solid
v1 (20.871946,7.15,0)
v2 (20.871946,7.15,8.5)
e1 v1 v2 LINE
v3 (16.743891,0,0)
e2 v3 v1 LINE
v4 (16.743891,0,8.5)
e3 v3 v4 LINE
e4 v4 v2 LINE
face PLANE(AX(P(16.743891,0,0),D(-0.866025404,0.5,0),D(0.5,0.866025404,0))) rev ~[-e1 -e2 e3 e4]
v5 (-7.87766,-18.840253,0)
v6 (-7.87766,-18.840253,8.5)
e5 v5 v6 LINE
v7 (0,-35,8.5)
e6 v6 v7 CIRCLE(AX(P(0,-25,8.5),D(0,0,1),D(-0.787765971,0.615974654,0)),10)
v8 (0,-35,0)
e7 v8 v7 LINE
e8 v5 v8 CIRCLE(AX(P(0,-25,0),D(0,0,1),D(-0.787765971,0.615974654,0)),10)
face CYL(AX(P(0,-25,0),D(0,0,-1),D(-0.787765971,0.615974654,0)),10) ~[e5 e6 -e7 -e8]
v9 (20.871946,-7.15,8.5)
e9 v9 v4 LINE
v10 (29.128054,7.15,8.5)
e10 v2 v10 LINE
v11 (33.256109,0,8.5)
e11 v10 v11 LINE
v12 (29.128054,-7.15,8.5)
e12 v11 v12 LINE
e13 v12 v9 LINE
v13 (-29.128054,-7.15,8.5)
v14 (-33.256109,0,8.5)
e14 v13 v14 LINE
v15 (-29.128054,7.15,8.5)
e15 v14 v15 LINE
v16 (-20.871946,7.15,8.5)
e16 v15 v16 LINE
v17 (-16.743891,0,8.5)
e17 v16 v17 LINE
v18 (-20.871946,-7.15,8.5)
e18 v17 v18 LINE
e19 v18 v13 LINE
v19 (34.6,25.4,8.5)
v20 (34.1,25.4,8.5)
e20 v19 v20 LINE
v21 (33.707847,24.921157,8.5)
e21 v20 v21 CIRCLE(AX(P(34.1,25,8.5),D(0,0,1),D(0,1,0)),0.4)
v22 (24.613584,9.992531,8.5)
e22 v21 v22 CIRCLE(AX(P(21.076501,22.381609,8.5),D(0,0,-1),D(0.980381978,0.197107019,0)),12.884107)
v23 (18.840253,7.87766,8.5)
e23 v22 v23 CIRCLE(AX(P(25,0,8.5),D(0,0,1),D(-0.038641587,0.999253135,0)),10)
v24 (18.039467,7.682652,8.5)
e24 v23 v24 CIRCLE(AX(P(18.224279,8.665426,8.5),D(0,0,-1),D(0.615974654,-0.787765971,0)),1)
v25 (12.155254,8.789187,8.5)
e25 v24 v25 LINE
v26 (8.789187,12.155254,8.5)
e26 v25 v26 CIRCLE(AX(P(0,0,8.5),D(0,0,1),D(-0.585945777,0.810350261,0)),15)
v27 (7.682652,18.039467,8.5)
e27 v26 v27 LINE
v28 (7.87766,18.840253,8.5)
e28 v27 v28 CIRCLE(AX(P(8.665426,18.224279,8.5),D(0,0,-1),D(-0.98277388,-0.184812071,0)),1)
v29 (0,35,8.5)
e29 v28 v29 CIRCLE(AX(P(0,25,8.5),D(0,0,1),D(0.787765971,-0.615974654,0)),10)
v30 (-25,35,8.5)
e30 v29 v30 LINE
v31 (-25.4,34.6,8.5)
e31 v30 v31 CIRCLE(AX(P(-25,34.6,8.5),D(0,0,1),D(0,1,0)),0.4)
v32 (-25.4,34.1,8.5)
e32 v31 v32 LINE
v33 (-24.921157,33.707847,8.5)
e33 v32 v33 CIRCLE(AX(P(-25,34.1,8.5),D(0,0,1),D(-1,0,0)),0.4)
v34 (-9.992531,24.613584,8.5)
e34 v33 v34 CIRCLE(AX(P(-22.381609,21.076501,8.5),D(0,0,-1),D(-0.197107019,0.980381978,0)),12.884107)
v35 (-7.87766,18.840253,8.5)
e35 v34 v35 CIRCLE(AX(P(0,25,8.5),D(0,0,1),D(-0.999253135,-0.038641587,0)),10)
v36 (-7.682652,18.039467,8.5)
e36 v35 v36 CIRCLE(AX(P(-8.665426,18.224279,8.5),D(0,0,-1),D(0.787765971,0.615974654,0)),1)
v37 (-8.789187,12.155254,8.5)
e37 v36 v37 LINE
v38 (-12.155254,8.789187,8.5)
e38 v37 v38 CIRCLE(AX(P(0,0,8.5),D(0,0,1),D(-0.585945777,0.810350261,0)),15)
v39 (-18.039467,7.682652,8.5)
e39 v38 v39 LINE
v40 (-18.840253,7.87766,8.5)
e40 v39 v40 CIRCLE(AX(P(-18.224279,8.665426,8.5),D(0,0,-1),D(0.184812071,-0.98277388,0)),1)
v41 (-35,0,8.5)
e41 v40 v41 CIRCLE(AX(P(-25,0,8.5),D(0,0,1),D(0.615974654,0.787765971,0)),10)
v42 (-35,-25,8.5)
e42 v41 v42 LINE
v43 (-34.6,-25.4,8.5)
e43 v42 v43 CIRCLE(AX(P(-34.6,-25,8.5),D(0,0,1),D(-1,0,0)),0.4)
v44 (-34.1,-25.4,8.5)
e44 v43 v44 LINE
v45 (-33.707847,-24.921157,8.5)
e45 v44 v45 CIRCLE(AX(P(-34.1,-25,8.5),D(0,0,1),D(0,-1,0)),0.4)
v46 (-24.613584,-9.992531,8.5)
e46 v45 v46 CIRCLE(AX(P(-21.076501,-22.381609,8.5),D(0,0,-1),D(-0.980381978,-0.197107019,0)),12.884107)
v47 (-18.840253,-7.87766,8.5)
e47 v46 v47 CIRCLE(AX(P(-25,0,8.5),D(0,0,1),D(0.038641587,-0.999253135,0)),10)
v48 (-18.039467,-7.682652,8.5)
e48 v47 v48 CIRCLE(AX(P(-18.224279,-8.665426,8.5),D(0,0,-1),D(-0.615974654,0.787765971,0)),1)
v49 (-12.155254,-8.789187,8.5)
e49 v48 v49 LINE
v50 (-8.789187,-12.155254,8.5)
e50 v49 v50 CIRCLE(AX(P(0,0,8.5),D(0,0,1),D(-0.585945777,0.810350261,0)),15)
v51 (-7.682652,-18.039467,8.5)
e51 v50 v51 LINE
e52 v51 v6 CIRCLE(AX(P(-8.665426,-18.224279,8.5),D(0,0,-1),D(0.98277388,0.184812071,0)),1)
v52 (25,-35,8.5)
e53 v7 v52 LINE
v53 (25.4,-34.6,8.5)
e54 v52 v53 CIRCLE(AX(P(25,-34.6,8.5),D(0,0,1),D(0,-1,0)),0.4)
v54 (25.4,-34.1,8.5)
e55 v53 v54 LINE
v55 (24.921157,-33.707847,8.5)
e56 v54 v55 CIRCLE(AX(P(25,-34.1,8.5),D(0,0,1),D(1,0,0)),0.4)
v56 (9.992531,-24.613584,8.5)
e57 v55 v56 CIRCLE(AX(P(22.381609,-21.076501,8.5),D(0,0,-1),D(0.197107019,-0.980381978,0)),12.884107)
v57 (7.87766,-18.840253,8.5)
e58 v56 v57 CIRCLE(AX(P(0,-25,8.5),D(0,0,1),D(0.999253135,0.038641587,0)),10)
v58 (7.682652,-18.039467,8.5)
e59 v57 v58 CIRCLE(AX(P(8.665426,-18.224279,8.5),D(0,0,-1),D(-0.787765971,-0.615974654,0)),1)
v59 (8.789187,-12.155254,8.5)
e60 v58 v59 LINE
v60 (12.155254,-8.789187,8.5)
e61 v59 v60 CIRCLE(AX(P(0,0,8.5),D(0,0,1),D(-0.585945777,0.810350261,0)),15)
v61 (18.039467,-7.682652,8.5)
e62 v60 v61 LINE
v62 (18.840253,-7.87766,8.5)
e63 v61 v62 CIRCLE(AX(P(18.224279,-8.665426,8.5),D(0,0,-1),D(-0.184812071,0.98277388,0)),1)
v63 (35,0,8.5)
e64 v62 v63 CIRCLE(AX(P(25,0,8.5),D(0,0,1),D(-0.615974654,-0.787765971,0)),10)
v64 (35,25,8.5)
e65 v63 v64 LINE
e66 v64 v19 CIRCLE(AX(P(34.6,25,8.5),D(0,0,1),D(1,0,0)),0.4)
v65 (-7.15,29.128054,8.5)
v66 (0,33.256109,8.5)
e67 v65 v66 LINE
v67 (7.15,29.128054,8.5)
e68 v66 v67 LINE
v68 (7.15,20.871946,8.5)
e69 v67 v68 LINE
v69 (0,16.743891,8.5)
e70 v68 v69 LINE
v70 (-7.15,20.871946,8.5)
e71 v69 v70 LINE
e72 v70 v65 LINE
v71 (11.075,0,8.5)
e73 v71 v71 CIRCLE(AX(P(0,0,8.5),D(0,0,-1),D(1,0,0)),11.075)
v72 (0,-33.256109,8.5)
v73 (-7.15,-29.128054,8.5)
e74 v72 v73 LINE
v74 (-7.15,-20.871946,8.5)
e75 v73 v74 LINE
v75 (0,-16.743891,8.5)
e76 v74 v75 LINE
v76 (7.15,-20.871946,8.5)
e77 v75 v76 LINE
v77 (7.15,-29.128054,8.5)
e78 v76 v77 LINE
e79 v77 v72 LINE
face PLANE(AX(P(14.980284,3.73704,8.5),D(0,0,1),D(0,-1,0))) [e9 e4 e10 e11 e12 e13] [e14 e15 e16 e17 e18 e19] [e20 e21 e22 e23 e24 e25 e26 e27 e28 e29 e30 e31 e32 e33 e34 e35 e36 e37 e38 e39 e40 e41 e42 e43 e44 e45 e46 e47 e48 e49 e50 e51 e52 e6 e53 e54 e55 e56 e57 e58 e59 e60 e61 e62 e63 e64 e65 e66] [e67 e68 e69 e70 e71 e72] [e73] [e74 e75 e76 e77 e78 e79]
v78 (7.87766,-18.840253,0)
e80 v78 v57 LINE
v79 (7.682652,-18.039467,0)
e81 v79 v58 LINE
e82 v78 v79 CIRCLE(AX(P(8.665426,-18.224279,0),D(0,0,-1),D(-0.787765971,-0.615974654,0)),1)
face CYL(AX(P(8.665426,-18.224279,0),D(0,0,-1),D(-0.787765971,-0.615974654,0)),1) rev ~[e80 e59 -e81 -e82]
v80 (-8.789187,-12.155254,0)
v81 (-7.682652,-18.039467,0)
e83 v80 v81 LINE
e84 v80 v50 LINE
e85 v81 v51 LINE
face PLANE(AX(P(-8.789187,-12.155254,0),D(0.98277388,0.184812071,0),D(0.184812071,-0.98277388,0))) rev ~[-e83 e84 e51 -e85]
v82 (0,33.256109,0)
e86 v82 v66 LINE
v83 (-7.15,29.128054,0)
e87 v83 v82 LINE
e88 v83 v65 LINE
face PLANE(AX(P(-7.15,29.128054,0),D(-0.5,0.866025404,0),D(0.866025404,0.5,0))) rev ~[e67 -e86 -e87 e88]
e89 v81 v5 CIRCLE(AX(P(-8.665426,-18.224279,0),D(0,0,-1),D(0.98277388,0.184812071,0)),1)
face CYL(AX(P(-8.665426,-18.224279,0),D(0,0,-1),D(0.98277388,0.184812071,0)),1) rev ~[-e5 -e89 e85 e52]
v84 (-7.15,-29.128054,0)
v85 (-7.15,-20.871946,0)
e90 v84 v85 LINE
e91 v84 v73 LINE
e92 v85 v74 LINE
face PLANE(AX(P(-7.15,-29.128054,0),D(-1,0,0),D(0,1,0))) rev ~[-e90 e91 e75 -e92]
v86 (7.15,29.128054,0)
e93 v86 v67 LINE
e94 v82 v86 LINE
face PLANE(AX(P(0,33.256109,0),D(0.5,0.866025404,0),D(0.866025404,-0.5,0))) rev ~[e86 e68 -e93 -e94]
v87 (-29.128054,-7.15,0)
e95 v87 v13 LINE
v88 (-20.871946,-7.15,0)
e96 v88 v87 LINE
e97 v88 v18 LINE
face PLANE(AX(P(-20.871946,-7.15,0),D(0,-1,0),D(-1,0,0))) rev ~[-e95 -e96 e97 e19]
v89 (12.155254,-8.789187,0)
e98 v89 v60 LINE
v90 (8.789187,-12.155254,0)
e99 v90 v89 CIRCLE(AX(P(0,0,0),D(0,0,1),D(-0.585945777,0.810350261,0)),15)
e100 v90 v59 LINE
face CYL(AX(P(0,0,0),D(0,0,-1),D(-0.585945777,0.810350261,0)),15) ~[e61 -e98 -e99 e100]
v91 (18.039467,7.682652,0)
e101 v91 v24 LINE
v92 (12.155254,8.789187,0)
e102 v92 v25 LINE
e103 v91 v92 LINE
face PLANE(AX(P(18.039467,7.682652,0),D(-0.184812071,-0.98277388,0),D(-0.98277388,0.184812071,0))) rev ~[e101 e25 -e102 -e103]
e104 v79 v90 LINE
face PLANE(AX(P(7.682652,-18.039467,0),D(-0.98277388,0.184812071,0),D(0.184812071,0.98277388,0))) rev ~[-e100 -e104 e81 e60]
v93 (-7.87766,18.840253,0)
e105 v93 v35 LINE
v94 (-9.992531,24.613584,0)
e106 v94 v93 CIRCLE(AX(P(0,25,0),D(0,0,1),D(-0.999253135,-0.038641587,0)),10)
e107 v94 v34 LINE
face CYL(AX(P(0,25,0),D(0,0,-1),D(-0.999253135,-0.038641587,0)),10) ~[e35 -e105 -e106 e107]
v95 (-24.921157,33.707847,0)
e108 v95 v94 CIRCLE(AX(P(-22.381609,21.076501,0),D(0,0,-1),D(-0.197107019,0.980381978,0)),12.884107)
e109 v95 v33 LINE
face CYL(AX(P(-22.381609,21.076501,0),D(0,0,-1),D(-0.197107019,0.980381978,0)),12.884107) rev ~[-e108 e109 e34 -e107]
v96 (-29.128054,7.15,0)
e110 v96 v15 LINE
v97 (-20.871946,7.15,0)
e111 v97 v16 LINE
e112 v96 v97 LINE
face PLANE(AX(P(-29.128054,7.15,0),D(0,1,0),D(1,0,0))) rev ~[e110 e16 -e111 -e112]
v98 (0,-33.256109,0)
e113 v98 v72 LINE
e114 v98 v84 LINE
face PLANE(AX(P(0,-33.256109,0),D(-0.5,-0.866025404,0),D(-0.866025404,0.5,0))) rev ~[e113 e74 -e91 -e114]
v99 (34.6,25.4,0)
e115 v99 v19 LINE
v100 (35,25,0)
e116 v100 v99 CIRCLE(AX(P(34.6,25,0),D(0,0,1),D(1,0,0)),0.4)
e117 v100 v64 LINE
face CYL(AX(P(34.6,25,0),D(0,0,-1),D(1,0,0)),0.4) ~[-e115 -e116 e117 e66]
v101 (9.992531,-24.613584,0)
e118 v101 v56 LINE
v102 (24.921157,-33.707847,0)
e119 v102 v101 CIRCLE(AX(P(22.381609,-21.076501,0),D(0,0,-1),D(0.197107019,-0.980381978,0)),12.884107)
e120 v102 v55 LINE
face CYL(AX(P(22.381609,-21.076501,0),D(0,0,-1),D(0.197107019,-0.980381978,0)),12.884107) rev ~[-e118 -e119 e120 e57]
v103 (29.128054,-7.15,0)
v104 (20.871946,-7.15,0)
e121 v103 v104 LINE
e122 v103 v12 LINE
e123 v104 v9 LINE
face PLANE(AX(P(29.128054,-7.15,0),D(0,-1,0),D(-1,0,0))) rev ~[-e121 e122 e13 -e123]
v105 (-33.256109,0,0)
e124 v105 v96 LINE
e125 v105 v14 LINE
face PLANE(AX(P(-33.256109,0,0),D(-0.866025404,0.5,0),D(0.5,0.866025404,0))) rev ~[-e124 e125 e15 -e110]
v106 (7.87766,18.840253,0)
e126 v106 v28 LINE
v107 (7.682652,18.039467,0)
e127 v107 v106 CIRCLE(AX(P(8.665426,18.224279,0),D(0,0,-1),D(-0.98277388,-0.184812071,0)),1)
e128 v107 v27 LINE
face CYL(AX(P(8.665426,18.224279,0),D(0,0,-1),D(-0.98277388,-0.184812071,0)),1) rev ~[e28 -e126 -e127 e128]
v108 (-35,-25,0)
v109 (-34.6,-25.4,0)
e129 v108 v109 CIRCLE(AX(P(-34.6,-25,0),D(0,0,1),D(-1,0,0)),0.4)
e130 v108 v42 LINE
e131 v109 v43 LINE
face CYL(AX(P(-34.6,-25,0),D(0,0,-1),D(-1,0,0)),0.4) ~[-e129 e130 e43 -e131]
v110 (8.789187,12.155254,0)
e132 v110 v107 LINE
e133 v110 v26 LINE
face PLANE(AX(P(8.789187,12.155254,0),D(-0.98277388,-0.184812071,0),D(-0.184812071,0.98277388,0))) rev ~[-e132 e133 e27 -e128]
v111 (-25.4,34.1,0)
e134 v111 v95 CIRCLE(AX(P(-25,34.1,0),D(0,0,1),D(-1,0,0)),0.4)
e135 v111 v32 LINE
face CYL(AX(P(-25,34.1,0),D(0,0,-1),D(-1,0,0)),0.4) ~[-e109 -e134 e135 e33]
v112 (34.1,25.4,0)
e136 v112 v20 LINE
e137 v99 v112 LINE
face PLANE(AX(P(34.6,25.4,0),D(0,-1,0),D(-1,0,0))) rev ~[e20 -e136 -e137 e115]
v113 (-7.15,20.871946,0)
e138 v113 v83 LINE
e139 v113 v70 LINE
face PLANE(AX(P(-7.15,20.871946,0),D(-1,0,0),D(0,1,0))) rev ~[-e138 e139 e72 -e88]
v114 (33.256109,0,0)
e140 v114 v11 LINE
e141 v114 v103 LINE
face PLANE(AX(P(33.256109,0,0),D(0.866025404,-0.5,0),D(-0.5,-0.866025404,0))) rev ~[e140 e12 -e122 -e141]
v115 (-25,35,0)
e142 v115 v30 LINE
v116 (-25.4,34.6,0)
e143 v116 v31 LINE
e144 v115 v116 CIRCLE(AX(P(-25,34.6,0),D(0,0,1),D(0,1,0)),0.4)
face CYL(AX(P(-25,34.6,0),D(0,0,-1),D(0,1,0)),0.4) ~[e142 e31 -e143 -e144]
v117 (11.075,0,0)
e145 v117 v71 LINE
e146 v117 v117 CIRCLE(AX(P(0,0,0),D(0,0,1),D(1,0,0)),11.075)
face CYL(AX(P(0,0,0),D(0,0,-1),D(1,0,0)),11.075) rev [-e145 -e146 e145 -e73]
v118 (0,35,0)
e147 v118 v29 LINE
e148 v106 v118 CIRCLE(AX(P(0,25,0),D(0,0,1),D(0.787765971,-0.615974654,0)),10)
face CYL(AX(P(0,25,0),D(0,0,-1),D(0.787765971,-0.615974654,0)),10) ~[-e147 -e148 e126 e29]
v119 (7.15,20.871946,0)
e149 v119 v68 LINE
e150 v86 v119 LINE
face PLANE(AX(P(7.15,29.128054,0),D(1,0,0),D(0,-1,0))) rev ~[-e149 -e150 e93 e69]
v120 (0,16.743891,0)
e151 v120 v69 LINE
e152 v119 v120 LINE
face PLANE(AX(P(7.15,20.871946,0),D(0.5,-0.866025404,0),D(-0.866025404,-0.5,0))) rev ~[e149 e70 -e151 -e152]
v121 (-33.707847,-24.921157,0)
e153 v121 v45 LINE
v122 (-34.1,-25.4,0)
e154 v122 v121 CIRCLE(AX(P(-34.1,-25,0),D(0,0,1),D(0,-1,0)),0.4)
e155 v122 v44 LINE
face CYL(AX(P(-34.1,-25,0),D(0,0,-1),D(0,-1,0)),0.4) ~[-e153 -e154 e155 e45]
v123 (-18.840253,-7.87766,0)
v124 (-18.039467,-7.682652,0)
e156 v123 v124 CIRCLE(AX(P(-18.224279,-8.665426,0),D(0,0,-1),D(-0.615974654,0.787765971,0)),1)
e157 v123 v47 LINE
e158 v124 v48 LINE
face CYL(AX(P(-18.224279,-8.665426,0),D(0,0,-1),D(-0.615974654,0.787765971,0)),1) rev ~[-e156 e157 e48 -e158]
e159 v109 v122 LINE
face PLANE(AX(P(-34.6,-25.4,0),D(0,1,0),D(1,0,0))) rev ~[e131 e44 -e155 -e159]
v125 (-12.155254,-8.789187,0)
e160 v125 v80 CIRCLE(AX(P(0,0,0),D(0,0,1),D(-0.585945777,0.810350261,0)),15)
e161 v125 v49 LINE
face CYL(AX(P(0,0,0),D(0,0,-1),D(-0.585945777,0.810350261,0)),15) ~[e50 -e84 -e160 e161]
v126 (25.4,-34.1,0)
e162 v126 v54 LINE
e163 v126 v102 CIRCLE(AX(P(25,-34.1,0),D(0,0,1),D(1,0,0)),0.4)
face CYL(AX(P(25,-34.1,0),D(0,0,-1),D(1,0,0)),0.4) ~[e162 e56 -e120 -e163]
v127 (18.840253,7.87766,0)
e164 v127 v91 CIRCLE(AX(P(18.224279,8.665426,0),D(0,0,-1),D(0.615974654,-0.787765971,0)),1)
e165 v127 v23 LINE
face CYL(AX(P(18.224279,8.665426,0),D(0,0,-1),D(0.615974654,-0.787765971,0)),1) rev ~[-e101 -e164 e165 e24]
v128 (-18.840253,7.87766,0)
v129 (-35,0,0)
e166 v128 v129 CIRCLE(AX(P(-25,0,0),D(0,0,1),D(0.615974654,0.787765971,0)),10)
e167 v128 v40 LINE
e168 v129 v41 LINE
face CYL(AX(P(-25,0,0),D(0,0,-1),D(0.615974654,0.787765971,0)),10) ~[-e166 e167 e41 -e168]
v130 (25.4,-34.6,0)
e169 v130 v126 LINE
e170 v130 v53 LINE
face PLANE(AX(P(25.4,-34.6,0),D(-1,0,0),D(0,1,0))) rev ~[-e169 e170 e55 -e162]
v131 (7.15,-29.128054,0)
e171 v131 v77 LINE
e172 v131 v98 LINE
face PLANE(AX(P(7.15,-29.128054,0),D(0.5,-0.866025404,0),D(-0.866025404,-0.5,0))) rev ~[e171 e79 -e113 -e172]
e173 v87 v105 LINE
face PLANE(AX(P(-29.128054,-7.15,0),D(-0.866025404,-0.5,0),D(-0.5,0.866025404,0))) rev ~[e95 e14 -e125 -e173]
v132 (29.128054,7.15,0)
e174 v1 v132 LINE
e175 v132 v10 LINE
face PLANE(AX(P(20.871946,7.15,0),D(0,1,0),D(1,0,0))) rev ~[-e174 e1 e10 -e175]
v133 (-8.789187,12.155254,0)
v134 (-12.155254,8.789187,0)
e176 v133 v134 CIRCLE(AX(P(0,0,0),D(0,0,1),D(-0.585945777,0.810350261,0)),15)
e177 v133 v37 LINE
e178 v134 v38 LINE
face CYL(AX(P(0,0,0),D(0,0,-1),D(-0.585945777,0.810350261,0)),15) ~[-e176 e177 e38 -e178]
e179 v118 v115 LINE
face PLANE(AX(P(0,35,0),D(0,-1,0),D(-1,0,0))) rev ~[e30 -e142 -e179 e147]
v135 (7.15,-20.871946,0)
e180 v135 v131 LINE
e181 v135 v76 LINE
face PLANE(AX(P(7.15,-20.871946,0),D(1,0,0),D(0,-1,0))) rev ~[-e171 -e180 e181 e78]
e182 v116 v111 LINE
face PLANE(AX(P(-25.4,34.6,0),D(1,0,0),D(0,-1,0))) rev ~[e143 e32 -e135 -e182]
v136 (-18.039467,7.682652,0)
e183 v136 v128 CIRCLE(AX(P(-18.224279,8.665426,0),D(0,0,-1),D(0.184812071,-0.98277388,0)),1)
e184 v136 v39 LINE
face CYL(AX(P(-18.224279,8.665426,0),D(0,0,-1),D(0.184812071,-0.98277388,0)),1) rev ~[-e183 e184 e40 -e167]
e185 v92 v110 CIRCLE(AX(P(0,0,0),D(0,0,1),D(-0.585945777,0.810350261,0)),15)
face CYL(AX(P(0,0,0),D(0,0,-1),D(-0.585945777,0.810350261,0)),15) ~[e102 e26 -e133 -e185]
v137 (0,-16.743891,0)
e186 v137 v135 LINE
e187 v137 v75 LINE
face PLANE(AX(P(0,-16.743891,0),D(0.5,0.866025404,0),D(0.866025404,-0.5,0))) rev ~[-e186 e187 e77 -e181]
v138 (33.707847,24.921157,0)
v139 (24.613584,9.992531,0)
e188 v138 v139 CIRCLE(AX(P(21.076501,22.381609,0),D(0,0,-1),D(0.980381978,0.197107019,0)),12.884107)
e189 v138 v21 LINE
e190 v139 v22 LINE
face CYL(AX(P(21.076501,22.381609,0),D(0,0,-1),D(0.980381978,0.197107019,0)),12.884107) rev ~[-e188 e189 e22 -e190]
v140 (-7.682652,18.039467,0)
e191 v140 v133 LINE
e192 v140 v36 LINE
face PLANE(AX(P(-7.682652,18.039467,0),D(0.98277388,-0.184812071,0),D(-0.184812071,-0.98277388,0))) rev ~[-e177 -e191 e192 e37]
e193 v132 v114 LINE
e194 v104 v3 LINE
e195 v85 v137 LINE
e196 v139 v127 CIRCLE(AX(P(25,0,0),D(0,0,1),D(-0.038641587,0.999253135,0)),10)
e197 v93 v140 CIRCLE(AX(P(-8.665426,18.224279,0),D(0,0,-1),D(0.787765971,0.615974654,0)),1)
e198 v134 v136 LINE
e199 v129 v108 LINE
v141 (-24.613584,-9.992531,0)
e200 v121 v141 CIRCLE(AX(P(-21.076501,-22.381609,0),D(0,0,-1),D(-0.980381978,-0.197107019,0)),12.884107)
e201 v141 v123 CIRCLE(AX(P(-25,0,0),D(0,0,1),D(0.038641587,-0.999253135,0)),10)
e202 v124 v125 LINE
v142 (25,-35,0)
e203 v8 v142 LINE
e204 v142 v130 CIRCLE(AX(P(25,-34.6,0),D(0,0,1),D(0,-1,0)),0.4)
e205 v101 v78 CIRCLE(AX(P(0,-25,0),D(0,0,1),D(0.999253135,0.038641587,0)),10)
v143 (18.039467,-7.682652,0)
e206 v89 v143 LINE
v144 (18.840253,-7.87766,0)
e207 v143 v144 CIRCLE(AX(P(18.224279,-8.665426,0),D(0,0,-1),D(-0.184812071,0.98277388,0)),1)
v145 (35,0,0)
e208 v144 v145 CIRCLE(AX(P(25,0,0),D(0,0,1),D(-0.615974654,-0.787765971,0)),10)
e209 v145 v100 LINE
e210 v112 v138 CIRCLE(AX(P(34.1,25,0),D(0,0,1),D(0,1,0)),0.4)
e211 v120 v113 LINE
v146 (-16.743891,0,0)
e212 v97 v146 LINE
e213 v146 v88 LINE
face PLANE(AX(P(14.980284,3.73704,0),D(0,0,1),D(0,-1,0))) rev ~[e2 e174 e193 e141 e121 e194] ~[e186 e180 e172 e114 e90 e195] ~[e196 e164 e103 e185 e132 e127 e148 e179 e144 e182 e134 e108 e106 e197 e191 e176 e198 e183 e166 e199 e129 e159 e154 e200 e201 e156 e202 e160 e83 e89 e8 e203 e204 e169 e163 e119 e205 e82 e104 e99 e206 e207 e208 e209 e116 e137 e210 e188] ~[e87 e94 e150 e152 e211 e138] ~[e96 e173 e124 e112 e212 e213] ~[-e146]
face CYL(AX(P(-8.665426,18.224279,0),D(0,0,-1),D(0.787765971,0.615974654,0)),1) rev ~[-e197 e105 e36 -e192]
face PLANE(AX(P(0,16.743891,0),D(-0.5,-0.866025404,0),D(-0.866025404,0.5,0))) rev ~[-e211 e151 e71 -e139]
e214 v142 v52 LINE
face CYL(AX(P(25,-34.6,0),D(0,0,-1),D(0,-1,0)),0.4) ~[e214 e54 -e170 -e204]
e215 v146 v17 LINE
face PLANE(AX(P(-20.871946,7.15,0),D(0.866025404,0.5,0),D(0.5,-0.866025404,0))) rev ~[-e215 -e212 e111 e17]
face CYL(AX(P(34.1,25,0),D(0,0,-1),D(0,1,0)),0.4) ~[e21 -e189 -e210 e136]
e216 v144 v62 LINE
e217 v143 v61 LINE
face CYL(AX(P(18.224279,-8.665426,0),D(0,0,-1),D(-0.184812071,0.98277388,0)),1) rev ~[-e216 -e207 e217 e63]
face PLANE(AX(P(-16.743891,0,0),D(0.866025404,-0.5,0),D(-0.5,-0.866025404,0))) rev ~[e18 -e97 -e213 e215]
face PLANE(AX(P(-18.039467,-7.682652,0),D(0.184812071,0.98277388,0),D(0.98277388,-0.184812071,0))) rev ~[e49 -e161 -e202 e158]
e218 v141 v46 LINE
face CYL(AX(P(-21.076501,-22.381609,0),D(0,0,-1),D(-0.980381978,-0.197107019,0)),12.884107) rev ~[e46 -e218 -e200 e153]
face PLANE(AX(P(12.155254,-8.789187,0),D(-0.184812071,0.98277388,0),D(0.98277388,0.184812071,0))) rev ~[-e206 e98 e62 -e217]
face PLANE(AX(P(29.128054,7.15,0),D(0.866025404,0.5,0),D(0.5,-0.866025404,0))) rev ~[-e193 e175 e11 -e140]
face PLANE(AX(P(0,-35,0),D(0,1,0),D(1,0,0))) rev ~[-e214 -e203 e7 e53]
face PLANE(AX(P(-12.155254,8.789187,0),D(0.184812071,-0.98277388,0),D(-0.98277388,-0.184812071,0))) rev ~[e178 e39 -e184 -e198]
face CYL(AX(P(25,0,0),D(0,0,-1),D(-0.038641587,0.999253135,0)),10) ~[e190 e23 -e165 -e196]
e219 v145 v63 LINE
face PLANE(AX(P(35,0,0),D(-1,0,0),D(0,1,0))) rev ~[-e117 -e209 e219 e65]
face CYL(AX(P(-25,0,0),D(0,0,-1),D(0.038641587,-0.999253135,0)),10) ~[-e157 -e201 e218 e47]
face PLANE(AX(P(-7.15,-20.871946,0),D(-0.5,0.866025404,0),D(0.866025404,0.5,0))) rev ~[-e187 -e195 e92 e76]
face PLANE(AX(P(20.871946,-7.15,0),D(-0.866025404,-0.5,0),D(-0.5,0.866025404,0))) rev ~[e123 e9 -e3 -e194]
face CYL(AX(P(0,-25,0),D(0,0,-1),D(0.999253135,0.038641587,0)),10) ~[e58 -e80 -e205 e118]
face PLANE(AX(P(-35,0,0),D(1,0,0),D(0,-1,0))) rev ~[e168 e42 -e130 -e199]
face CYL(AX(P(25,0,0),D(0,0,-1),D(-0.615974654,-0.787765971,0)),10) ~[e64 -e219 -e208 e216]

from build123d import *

# Parameters (mm, degrees)
F0_R     = 11.075
F2_DEPTH = 8.5
F3_COUNT = 4


# Not quite as in the source:
# - a feature names something its author has since deleted; it is built from what else it names


with BuildPart() as f2:
    # F0 (on Top) → F2 (new body)
    with BuildSketch(Plane.XY):
        with BuildLine():
            Line((-7.6826518036, 18.0394667333), (-8.7891866596, 12.1552539201))
            ThreePointArc((-8.7891866596, 12.1552539201), (0, -15), (8.7891866596, 12.1552539201))
            Line((8.7891866596, 12.1552539201), (7.6826518036, 18.0394667333))
            ThreePointArc((7.6826518036, 18.0394667333), (7.6938199579, 18.4608846247), (7.8776597121, 18.840253458))
            ThreePointArc((7.8776597121, 18.840253458), (8.9888115293, 29.3819250667), (0, 35))
            Line((0, 35), (-25, 35))
            ThreePointArc((-25, 35), (-25.2828427125, 34.8828427125), (-25.4, 34.6))
            Line((-25.4, 34.6), (-25.4, 34.1))
            ThreePointArc((-25.4, 34.1), (-25.2534392204, 33.7905350399), (-24.9211571922, 33.7078472088))
            ThreePointArc((-24.9211571922, 33.7078472088), (-15.6786460864, 32.0797048321), (-9.9925313497, 24.6135841297))
            ThreePointArc((-9.9925313497, 24.6135841297), (-9.3898226238, 21.5603443352), (-7.8776597121, 18.840253458))
            ThreePointArc((-7.8776597121, 18.840253458), (-7.6938199579, 18.4608846247), (-7.6826518036, 18.0394667333))
        make_face()
        Circle(F0_R, mode=Mode.SUBTRACT)
        Polygon((0, 33.2561088494), (7.15, 29.1280544247), (7.15, 20.8719455753), (0, 16.7438911506), (-7.15, 20.8719455753), (-7.15, 29.1280544247), align=None, mode=Mode.SUBTRACT)
    extrude(amount=F2_DEPTH)

    # F3: F2 ×4 about axis
    f3_axis = Axis((0, 0, 16.6777409613), (0, 0, 1))


with BuildPart() as f2_1:
    add(f2.part)
    for i in range(1, F3_COUNT):
        add(f2.part.rotate(f3_axis, i * 360 / F3_COUNT))


solid = f2_1.part
